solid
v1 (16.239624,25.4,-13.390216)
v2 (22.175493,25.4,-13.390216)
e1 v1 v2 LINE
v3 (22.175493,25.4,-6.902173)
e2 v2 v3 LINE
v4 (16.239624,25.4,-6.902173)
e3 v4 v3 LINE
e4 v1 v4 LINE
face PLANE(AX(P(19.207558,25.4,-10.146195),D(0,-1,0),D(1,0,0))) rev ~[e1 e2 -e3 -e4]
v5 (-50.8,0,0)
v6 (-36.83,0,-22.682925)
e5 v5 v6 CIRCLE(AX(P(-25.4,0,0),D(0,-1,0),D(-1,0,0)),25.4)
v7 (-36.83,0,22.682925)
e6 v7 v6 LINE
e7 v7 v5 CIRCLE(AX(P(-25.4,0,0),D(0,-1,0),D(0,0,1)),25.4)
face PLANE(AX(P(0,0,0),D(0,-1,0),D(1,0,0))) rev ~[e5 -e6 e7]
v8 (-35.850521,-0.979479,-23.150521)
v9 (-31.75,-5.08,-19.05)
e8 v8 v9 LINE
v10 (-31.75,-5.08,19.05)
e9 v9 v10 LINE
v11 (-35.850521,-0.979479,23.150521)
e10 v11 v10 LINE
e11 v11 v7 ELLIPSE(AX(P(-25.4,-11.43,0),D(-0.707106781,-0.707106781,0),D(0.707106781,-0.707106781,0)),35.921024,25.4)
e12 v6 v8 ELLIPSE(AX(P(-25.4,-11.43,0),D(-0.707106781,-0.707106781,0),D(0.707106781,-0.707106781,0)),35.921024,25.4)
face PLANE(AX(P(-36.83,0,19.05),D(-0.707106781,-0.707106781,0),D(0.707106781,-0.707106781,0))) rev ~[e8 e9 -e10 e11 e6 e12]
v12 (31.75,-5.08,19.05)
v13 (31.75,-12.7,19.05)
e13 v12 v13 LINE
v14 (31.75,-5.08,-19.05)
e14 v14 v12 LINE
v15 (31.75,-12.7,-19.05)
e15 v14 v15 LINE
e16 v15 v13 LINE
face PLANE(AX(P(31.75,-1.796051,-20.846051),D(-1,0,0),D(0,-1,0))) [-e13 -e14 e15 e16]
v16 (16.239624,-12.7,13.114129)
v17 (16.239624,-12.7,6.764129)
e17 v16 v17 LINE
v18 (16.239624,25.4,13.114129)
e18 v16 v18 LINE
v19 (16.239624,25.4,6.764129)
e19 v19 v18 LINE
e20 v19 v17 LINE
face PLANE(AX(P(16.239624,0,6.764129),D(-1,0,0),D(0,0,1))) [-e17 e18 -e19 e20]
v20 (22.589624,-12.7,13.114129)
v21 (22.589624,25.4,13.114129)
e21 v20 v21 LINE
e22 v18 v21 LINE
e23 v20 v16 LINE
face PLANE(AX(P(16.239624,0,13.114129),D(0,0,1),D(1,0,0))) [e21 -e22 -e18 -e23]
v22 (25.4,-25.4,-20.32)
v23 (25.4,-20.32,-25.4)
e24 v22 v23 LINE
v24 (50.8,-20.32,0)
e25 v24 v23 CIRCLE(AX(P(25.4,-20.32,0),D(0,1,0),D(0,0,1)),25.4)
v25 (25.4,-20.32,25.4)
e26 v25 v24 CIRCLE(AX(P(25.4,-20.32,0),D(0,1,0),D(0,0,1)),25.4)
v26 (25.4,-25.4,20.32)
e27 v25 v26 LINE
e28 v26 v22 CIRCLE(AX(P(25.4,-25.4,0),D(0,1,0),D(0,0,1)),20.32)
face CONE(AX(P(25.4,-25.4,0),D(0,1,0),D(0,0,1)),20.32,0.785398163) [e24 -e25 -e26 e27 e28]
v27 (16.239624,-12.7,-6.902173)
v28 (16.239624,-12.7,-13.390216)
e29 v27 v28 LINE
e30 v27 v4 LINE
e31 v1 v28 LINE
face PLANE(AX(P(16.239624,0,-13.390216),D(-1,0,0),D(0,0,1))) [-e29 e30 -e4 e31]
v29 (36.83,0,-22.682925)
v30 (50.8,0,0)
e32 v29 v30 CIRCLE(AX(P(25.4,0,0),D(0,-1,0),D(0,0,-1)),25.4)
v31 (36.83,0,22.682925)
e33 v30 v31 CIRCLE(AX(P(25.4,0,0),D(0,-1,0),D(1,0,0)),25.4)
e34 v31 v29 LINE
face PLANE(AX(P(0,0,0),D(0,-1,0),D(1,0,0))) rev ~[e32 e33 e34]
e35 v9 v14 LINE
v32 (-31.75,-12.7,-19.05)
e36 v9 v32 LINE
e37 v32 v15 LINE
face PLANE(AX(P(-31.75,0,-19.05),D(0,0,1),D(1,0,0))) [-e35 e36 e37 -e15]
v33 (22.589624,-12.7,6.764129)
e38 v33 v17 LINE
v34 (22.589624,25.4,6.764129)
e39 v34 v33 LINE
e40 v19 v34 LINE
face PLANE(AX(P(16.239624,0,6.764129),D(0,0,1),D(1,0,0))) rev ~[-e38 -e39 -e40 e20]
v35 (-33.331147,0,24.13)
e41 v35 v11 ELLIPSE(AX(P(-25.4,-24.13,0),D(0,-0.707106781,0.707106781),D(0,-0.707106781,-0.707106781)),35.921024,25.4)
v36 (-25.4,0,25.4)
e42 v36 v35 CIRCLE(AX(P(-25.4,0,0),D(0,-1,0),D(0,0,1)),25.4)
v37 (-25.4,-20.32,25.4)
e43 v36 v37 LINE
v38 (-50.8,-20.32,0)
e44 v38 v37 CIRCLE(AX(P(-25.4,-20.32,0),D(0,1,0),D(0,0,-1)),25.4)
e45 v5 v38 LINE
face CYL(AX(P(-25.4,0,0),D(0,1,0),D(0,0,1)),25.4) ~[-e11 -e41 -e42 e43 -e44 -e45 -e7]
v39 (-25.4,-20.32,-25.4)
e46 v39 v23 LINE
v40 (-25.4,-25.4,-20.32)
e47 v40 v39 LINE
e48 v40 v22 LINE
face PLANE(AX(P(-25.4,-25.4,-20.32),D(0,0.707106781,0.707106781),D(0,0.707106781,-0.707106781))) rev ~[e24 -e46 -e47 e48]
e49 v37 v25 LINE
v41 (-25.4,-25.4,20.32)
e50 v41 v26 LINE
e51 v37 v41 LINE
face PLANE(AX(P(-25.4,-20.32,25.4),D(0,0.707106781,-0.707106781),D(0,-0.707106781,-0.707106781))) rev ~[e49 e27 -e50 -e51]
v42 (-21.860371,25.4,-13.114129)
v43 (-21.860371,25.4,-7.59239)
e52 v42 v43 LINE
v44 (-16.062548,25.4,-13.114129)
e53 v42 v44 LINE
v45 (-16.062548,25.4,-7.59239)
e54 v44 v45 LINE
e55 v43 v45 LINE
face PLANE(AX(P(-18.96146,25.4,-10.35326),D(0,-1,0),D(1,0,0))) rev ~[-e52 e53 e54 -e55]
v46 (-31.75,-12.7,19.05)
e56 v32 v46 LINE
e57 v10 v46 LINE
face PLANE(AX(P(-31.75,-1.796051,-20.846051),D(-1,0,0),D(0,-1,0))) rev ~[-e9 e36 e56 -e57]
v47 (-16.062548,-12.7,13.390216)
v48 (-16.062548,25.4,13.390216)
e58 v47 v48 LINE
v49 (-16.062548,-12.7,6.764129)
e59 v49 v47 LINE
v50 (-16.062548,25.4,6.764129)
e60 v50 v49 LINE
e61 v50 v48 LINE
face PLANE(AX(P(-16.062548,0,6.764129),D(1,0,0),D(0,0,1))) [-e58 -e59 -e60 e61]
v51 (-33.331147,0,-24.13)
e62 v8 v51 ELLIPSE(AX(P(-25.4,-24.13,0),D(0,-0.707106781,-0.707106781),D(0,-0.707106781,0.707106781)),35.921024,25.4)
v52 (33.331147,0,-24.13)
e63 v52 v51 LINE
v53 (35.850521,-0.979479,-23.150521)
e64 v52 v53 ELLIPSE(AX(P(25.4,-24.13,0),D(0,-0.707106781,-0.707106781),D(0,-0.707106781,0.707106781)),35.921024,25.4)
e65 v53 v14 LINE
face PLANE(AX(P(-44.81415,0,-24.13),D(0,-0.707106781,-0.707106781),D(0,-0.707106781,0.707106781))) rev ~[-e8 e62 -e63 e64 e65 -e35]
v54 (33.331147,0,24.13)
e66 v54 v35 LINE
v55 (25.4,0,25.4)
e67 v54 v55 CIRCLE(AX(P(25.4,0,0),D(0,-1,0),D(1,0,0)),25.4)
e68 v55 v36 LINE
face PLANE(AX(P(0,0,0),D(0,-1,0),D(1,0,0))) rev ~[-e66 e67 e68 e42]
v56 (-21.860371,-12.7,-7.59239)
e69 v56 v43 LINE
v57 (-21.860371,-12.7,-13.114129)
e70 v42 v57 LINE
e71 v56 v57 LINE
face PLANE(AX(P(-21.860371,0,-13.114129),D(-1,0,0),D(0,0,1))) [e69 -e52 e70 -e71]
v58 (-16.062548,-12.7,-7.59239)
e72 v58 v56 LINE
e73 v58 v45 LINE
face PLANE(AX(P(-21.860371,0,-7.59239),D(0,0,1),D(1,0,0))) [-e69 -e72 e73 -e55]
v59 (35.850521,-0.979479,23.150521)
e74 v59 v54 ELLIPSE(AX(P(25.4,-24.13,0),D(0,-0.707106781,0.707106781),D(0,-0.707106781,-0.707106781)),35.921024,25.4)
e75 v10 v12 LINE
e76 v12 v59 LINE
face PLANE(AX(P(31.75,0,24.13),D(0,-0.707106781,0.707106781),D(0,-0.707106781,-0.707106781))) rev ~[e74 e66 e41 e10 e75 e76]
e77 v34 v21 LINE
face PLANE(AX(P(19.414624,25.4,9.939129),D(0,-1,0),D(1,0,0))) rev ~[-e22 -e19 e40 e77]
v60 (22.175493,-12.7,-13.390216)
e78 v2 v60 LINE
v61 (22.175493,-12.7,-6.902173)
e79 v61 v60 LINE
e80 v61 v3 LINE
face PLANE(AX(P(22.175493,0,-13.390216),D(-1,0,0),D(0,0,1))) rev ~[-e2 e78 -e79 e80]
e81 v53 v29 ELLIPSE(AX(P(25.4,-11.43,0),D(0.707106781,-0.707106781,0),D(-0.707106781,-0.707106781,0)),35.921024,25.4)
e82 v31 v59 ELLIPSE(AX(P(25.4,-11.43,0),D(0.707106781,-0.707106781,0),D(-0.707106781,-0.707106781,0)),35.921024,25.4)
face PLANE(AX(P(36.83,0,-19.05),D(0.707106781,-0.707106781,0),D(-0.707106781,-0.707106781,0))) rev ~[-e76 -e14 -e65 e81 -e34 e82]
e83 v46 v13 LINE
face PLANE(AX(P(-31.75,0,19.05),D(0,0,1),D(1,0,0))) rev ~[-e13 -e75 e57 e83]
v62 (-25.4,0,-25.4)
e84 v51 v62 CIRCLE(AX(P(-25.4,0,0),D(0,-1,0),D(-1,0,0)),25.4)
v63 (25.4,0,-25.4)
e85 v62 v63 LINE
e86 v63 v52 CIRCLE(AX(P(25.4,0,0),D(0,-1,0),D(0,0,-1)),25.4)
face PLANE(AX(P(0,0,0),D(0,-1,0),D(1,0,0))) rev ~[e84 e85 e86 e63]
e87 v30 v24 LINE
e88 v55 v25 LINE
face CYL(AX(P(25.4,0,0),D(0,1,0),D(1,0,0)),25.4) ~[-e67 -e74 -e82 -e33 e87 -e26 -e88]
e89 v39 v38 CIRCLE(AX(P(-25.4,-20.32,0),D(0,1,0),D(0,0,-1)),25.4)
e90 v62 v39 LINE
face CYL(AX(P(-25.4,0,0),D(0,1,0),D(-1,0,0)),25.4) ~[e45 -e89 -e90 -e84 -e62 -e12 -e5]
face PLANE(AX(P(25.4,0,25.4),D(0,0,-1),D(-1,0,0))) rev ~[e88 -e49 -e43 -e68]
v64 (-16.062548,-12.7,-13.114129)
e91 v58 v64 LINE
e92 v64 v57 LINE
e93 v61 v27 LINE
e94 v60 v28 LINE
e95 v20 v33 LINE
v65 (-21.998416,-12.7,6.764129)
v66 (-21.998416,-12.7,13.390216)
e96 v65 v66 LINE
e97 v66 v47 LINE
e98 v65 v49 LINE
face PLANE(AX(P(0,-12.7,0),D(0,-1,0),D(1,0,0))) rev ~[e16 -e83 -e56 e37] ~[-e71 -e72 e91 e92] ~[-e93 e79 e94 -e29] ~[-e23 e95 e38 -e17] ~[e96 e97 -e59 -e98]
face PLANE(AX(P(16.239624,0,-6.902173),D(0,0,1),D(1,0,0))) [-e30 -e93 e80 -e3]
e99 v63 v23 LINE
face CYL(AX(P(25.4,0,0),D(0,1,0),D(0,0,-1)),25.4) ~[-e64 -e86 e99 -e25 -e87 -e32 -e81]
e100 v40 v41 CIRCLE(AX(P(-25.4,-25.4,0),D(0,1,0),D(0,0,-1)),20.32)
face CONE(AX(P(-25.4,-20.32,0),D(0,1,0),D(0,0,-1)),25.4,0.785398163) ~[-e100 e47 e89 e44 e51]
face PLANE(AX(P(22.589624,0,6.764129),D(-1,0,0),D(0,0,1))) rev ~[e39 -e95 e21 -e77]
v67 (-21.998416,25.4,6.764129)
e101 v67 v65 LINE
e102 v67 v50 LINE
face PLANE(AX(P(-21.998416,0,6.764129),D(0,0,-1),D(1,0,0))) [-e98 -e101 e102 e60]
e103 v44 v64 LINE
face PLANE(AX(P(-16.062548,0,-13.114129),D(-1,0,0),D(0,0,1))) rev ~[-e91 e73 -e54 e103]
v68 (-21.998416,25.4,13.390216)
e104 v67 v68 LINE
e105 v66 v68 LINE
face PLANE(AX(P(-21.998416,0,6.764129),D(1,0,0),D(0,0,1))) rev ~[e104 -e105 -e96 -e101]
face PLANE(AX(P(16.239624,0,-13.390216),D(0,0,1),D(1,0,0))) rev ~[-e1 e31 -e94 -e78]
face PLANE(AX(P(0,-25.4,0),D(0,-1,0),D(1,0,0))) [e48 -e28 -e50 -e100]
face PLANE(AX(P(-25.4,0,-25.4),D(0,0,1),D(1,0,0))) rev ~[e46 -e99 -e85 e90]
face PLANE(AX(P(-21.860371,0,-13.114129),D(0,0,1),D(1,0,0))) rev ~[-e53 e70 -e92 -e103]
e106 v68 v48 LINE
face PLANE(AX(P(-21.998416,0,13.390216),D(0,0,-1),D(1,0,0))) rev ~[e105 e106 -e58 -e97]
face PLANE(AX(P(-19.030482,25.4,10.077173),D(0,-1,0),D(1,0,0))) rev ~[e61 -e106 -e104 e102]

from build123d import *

# Parameters (mm, degrees)
F1_DEPTH     = 25.4
F2_W         = 63.5
F2_H         = 38.1
F3_DEPTH     = 12.7
F4_T1_DEPTH  = 63.5
F4_T3_DEPTH  = 38.1
F4_T5_DEPTH  = 50.8
F4_T8_ANGLE  = 180
F4_T10_ANGLE = 180
F4_T15_DEPTH = 76.5641495789
F4_S16_R     = 25.4
F4_T17_DEPTH = 40
F4_T21_DEPTH = 51.1641495789
F4_S22_R     = 25.4
F4_T23_DEPTH = 27
F4_T30_DEPTH = 76.5641495789
F4_S31_R     = 25.4
F4_T32_DEPTH = 40
F4_T36_DEPTH = 51.1641495789
F4_S37_R     = 25.4
F4_T38_DEPTH = 27
F4_T45_DEPTH = 51.1641495789
F4_S46_R     = 25.4
F4_T47_DEPTH = 27
F4_T51_DEPTH = 76.5641495789
F4_S52_R     = 25.4
F4_T53_DEPTH = 40
F4_T60_DEPTH = 76.5641495789
F4_S61_R     = 25.4
F4_T62_DEPTH = 40
F4_T66_DEPTH = 51.1641495789
F4_S67_R     = 25.4
F4_T68_DEPTH = 27
F5_W         = 6.35
F5_H         = 6.35
F5_W_2       = 5.9358693383
F5_H_2       = 6.4880426841
F5_W_3       = 5.79782274
F5_H_3       = 5.521739329
F5_W_4       = 5.9358680336
F5_H_4       = 6.6260866729
F6_DEPTH     = 25.4


# Not quite as in the source:
# - a fillet or chamfer that OpenCascade refuses, or shapes differently, is made with other operations: its cross-section is extruded or revolved along the edge and cut away or added


with BuildPart() as f1:
    # F0 (on Front) → F1 (new body)
    with BuildSketch(Plane.XZ):
        with BuildLine():
            ThreePointArc((-50.8, 0), (-43.3605122421, -17.9605122421), (-25.4, -25.4))
            Line((-25.4, -25.4), (25.4, -25.4))
            ThreePointArc((25.4, -25.4), (43.3605122421, -17.9605122421), (50.8, 0))
            ThreePointArc((50.8, 0), (43.3605122421, 17.9605122421), (25.4, 25.4))
            Line((25.4, 25.4), (-25.4, 25.4))
            ThreePointArc((-25.4, 25.4), (-43.3605122421, 17.9605122421), (-50.8, 0))
        make_face()
    extrude(amount=F1_DEPTH)

    # F2 (on Front) → F3 (cut)
    with BuildSketch(Plane.XZ):
        Rectangle(F2_W, F2_H)
    extrude(amount=F3_DEPTH, mode=Mode.SUBTRACT)

    # F4: chamfer of 5.08 on 8 edges, made by hand

    # F4_s2 → F4_t1 (cut)
    with BuildSketch(Plane.YZ.offset(-31.75)):
        Polygon((0, 24.13), (-5.08, 19.05), (0, 19.05), align=None)
        Polygon((0, -24.13), (-5.08, -19.05), (0, -19.05), align=None)
    extrude(amount=F4_T1_DEPTH, mode=Mode.SUBTRACT)

    # F4_s4 → F4_t3 (cut)
    with BuildSketch(Plane.XY.offset(-19.05)):
        Polygon((-36.83, 0), (-31.75, -5.08), (-31.75, 0), align=None)
        Polygon((36.83, 0), (31.75, -5.08), (31.75, 0), align=None)
    extrude(amount=F4_T3_DEPTH, mode=Mode.SUBTRACT)

    # F4_s6 → F4_t5 (cut)
    with BuildSketch(Plane.YZ.offset(-25.4)):
        Polygon((-20.32, 25.4), (-25.4, 20.32), (-25.4, 25.4), align=None)
        Polygon((-25.4, -20.32), (-20.32, -25.4), (-25.4, -25.4), align=None)
    extrude(amount=F4_T5_DEPTH, mode=Mode.SUBTRACT)

    # F4_s7 → F4_t8 (revolve, cut)
    with BuildSketch(Plane.YZ.offset(-25.4)):
        Polygon((-20.32, -25.4), (-25.4, -20.32), (-25.4, -25.4), align=None)
    revolve(axis=Axis((-25.4, -25.4, 0), (0, 1, 0)), revolution_arc=F4_T8_ANGLE, mode=Mode.SUBTRACT)

    # F4_s9 → F4_t10 (revolve, cut)
    with BuildSketch(Plane.YZ.offset(25.4)):
        Polygon((-25.4, 20.32), (-20.32, 25.4), (-25.4, 25.4), align=None)
    revolve(axis=Axis((25.4, -25.4, 0), (0, 1, 0)), revolution_arc=F4_T10_ANGLE, mode=Mode.SUBTRACT)


with BuildPart() as f4_tool13:
    # F4_s14 → F4_t15 (new body)
    with BuildSketch(Plane.YZ.offset(44.8141495789)):
        Polygon((0, 24.13), (-5.08, 19.05), (0, 19.05), align=None)
    extrude(amount=-F4_T15_DEPTH)

    # F4_s16 → F4_t17 (intersect, symmetric)
    with BuildSketch(Plane.XZ.offset(2.5)):
        with Locations((25.4, 0)):
            Circle(F4_S16_R)
    extrude(amount=F4_T17_DEPTH, both=True, mode=Mode.INTERSECT)

    split(bisect_by=Plane.YZ.offset(31.75), keep=Keep.TOP)


with BuildPart() as f4_tool19:
    # F4_s20 → F4_t21 (new body)
    with BuildSketch(Plane.XY.offset(-19.05)):
        Polygon((36.83, 0), (31.75, -5.08), (31.75, 0), align=None)
    extrude(amount=F4_T21_DEPTH)

    # F4_s22 → F4_t23 (intersect, symmetric)
    with BuildSketch(Plane.XZ.offset(2.5)):
        with Locations((25.4, 0)):
            Circle(F4_S22_R)
    extrude(amount=F4_T23_DEPTH, both=True, mode=Mode.INTERSECT)

    split(bisect_by=Plane.XY.offset(19.05), keep=Keep.TOP)


with BuildPart() as f4_tool13_1:
    add(f4_tool13.part)

    # F4_t25: intersect F4_tool19
    add(f4_tool19.part, mode=Mode.INTERSECT)


with BuildPart() as f1_1:
    add(f1.part)

    # F4_t11: cut F4_tool13
    add(f4_tool13_1.part, mode=Mode.SUBTRACT)


with BuildPart() as f4_tool28:
    # F4_s29 → F4_t30 (new body)
    with BuildSketch(Plane.YZ.offset(31.75)):
        Polygon((0, 24.13), (-5.08, 19.05), (0, 19.05), align=None)
    extrude(amount=-F4_T30_DEPTH)

    # F4_s31 → F4_t32 (intersect, symmetric)
    with BuildSketch(Plane.XZ.offset(2.5)):
        with Locations((-25.4, 0)):
            Circle(F4_S31_R)
    extrude(amount=F4_T32_DEPTH, both=True, mode=Mode.INTERSECT)

    split(bisect_by=Plane.YZ.offset(-31.75), keep=Keep.BOTTOM)


with BuildPart() as f4_tool34:
    # F4_s35 → F4_t36 (new body)
    with BuildSketch(Plane.XY.offset(32.1141495789)):
        Polygon((-36.83, 0), (-31.75, -5.08), (-31.75, 0), align=None)
    extrude(amount=-F4_T36_DEPTH)

    # F4_s37 → F4_t38 (intersect, symmetric)
    with BuildSketch(Plane.XZ.offset(2.5)):
        with Locations((-25.4, 0)):
            Circle(F4_S37_R)
    extrude(amount=F4_T38_DEPTH, both=True, mode=Mode.INTERSECT)

    split(bisect_by=Plane.XY.offset(19.05), keep=Keep.TOP)


with BuildPart() as f4_tool28_1:
    add(f4_tool28.part)

    # F4_t40: intersect F4_tool34
    add(f4_tool34.part, mode=Mode.INTERSECT)


with BuildPart() as f1_2:
    add(f1_1.part)

    # F4_t26: cut F4_tool28
    add(f4_tool28_1.part, mode=Mode.SUBTRACT)


with BuildPart() as f4_tool43:
    # F4_s44 → F4_t45 (new body)
    with BuildSketch(Plane.XY.offset(19.05)):
        Polygon((-36.83, 0), (-31.75, -5.08), (-31.75, 0), align=None)
    extrude(amount=-F4_T45_DEPTH)

    # F4_s46 → F4_t47 (intersect, symmetric)
    with BuildSketch(Plane.XZ.offset(2.5)):
        with Locations((-25.4, 0)):
            Circle(F4_S46_R)
    extrude(amount=F4_T47_DEPTH, both=True, mode=Mode.INTERSECT)

    split(bisect_by=Plane.XY.offset(-19.05), keep=Keep.BOTTOM)


with BuildPart() as f4_tool49:
    # F4_s50 → F4_t51 (new body)
    with BuildSketch(Plane.YZ.offset(-44.8141495789)):
        Polygon((0, -24.13), (-5.08, -19.05), (0, -19.05), align=None)
    extrude(amount=F4_T51_DEPTH)

    # F4_s52 → F4_t53 (intersect, symmetric)
    with BuildSketch(Plane.XZ.offset(2.5)):
        with Locations((-25.4, 0)):
            Circle(F4_S52_R)
    extrude(amount=F4_T53_DEPTH, both=True, mode=Mode.INTERSECT)

    split(bisect_by=Plane.YZ.offset(-31.75), keep=Keep.BOTTOM)


with BuildPart() as f4_tool43_1:
    add(f4_tool43.part)

    # F4_t55: intersect F4_tool49
    add(f4_tool49.part, mode=Mode.INTERSECT)


with BuildPart() as f1_3:
    add(f1_2.part)

    # F4_t41: cut F4_tool43
    add(f4_tool43_1.part, mode=Mode.SUBTRACT)


with BuildPart() as f4_tool58:
    # F4_s59 → F4_t60 (new body)
    with BuildSketch(Plane.YZ.offset(-31.75)):
        Polygon((0, -24.13), (-5.08, -19.05), (0, -19.05), align=None)
    extrude(amount=F4_T60_DEPTH)

    # F4_s61 → F4_t62 (intersect, symmetric)
    with BuildSketch(Plane.XZ.offset(2.5)):
        with Locations((25.4, 0)):
            Circle(F4_S61_R)
    extrude(amount=F4_T62_DEPTH, both=True, mode=Mode.INTERSECT)

    split(bisect_by=Plane.YZ.offset(31.75), keep=Keep.TOP)


with BuildPart() as f4_tool64:
    # F4_s65 → F4_t66 (new body)
    with BuildSketch(Plane.XY.offset(-32.1141495789)):
        Polygon((36.83, 0), (31.75, -5.08), (31.75, 0), align=None)
    extrude(amount=F4_T66_DEPTH)

    # F4_s67 → F4_t68 (intersect, symmetric)
    with BuildSketch(Plane.XZ.offset(2.5)):
        with Locations((25.4, 0)):
            Circle(F4_S67_R)
    extrude(amount=F4_T68_DEPTH, both=True, mode=Mode.INTERSECT)

    split(bisect_by=Plane.XY.offset(-19.05), keep=Keep.BOTTOM)


with BuildPart() as f4_tool58_1:
    add(f4_tool58.part)

    # F4_t70: intersect F4_tool64
    add(f4_tool64.part, mode=Mode.INTERSECT)


with BuildPart() as f1_4:
    add(f1_3.part)

    # F4_t56: cut F4_tool58
    add(f4_tool58_1.part, mode=Mode.SUBTRACT)

    # F5 (on Front) → F6 (join, symmetric)
    with BuildSketch(Plane.XZ):
        with Locations((19.4146236851, 9.9391293569)):
            Rectangle(F5_W, F5_H)
        with Locations((19.2075583543, -10.1461946878)):
            Rectangle(F5_W_2, F5_H_2)
        with Locations((-18.9614597259, -10.3532596925)):
            Rectangle(F5_W_3, F5_H_3)
        with Locations((-19.0304823727, 10.0771726934)):
            Rectangle(F5_W_4, F5_H_4)
    extrude(amount=F6_DEPTH, both=True)


solid = f1_4.part
